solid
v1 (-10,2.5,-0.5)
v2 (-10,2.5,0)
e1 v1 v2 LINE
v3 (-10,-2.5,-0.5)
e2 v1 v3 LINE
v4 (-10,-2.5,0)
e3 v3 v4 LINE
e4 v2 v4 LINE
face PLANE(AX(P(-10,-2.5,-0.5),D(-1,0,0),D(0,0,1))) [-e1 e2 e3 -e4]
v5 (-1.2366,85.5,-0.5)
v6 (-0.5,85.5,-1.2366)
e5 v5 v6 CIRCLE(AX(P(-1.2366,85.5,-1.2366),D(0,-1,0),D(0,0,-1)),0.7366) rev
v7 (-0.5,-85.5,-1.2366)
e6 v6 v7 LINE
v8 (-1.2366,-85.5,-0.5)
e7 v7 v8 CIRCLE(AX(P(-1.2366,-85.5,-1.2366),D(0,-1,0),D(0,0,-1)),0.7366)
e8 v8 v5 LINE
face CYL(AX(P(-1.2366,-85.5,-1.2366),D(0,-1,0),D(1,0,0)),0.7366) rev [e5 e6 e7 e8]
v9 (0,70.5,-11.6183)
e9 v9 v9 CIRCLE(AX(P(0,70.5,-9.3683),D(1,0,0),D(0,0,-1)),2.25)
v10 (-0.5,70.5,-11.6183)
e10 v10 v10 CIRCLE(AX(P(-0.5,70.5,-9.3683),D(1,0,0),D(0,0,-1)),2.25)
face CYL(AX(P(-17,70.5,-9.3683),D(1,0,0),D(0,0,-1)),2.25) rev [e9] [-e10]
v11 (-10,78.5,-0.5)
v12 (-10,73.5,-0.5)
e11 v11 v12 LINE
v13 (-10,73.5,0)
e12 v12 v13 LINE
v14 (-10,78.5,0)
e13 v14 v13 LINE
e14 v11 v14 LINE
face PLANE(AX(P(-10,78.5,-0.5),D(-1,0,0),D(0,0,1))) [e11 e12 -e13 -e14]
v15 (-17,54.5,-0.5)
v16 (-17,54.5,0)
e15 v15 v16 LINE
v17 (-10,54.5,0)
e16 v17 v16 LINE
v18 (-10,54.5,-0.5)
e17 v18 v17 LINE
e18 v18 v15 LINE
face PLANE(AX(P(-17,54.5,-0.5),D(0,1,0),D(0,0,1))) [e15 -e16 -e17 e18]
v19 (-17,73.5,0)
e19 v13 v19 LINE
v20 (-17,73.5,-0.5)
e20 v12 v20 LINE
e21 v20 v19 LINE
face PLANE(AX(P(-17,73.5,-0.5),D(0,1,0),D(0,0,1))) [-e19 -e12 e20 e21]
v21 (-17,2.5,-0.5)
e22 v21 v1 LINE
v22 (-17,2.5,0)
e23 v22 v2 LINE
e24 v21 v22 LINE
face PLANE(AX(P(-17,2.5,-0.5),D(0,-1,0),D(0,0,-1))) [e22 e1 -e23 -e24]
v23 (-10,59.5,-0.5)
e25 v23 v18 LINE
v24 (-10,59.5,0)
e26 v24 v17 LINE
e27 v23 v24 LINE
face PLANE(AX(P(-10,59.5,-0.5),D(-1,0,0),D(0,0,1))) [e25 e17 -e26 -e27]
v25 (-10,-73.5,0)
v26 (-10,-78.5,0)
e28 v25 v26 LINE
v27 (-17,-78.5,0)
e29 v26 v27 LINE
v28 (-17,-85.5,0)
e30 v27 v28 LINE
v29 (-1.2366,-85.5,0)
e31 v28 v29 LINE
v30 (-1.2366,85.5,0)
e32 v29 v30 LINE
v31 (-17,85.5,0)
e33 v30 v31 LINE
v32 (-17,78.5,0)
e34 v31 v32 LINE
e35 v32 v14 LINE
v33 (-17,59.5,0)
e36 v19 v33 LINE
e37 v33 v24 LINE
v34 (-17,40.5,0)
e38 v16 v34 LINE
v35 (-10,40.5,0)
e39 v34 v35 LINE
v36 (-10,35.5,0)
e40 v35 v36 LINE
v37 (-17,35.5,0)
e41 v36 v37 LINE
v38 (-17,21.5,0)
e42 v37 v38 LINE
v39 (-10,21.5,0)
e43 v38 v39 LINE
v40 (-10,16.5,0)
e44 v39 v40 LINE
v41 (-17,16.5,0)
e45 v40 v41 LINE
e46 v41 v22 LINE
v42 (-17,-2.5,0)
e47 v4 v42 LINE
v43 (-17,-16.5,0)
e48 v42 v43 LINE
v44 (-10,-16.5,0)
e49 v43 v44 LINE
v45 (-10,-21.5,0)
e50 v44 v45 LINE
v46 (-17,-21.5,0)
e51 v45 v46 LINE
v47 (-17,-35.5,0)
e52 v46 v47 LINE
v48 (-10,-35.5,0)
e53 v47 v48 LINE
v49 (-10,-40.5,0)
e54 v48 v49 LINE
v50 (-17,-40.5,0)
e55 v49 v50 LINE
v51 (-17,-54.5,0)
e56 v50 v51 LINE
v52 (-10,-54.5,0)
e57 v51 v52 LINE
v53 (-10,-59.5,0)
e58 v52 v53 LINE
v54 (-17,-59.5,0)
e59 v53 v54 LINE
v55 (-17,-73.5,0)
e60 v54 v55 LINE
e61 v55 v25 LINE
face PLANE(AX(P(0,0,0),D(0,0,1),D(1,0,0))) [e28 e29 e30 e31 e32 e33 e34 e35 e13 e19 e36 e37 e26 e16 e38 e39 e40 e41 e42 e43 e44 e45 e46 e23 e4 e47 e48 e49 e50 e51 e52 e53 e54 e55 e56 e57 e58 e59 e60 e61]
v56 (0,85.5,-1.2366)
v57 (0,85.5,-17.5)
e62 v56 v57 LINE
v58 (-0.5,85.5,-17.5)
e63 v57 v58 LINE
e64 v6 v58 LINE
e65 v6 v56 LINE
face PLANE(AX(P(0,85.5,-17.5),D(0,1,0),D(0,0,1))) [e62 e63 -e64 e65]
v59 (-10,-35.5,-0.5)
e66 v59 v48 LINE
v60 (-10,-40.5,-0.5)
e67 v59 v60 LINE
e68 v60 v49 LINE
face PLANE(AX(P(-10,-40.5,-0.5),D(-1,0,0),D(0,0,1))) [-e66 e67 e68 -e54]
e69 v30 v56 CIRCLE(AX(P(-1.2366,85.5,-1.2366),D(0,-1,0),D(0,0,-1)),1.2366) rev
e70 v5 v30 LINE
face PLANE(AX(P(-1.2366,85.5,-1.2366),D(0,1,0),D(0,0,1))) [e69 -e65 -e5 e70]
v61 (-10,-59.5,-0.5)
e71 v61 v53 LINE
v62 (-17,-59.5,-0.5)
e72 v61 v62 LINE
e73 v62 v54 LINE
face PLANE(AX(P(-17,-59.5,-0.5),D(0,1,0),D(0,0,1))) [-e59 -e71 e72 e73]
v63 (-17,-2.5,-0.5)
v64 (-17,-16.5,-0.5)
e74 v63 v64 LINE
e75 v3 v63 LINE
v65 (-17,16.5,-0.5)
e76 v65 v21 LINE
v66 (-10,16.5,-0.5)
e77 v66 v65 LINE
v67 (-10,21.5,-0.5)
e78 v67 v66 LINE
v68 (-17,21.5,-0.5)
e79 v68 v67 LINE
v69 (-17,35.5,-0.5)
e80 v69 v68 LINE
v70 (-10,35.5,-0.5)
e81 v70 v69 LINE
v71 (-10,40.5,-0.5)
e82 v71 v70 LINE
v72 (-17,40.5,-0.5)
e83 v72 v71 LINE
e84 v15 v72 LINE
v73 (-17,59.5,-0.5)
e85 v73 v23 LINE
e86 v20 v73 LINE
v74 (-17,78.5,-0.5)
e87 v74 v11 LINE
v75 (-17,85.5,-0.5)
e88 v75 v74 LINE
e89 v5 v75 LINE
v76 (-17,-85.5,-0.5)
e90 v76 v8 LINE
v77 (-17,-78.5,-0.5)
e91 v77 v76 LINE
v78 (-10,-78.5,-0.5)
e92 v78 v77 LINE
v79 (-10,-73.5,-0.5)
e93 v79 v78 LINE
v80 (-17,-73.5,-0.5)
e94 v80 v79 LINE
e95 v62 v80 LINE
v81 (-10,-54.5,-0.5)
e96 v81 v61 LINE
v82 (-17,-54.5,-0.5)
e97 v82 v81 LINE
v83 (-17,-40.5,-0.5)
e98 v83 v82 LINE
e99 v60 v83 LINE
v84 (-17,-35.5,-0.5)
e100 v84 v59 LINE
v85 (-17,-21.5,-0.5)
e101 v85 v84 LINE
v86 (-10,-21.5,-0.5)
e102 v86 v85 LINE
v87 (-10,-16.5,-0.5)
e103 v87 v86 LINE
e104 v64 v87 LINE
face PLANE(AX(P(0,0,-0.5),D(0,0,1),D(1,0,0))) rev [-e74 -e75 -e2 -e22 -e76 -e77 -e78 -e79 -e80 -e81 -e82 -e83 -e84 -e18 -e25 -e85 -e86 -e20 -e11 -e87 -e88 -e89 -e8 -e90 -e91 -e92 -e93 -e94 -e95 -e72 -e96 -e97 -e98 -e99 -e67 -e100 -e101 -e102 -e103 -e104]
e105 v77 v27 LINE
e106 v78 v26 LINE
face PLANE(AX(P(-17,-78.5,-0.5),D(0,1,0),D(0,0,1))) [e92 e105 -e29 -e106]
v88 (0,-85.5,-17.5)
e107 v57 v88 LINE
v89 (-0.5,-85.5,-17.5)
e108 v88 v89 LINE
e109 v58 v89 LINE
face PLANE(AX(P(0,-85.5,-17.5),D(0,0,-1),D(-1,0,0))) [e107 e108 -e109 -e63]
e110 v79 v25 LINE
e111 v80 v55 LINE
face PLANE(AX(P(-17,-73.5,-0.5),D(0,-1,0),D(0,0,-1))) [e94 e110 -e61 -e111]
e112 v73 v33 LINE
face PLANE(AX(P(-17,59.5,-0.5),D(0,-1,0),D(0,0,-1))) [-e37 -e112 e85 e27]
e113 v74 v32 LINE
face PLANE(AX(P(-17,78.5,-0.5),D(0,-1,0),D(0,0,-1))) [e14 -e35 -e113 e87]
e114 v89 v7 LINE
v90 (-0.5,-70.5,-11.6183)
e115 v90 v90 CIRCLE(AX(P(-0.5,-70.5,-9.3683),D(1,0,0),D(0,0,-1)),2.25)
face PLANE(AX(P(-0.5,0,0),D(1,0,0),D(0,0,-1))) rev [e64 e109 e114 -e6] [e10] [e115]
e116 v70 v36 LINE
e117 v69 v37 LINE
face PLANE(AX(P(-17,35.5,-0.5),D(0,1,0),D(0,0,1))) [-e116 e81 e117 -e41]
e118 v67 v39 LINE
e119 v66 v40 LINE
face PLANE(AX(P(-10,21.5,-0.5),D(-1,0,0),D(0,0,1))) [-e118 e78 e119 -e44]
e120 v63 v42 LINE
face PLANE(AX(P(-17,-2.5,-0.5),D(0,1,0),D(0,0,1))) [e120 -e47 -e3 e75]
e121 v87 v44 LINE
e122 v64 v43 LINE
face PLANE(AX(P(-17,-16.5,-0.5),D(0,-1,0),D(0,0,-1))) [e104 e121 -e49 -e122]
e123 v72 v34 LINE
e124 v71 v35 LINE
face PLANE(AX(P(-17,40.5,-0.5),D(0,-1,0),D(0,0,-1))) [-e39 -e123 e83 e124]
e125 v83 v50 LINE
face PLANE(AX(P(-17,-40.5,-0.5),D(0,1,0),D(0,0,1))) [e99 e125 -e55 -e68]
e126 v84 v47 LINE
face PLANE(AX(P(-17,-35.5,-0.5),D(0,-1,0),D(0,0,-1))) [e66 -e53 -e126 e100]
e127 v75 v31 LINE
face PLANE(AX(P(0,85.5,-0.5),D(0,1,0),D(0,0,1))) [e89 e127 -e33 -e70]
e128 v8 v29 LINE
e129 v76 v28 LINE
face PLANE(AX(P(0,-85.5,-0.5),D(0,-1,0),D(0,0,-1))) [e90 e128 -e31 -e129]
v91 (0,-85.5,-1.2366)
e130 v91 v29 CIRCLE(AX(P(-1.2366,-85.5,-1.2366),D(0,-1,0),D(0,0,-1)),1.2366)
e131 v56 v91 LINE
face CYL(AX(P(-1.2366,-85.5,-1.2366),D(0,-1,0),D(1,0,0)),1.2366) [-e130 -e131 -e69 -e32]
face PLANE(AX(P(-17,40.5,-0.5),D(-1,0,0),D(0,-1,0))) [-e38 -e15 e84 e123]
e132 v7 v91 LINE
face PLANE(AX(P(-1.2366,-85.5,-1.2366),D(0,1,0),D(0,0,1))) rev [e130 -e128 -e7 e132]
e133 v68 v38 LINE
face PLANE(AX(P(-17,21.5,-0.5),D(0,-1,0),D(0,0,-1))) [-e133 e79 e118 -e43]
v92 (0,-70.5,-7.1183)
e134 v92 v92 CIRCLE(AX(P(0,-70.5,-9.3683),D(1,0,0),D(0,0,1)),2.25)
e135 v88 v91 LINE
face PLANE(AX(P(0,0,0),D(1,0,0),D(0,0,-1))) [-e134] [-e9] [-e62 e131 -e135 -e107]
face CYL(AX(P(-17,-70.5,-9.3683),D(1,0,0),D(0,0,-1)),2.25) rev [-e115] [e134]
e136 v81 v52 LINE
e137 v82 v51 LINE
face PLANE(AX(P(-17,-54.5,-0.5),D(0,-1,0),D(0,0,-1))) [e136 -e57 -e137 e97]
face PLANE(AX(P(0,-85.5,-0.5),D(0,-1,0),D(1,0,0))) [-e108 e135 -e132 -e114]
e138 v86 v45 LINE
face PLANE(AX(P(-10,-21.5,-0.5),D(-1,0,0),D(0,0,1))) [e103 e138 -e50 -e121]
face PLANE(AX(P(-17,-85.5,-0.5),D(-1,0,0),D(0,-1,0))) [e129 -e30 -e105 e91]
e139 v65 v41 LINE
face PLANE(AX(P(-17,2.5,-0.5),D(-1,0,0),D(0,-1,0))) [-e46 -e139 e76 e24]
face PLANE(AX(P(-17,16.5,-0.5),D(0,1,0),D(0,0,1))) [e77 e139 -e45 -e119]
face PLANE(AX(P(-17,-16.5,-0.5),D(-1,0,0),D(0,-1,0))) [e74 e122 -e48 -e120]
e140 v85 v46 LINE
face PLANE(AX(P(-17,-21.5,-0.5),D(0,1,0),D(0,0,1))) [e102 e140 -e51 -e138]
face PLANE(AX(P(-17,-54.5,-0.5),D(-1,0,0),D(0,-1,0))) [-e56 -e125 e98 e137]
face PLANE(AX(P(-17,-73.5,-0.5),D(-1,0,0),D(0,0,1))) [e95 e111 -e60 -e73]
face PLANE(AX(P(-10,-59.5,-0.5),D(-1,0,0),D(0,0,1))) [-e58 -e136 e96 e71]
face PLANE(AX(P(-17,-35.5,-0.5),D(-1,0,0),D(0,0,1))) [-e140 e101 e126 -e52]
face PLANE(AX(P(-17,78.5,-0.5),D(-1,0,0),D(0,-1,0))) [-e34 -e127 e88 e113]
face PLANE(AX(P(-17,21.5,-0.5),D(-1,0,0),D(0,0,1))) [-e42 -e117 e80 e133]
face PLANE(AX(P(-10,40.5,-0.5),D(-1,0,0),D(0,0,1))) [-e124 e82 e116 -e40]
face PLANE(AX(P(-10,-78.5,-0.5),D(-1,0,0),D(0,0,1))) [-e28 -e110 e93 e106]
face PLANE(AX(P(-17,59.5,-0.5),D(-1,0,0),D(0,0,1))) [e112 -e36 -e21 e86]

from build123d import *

# Parameters (mm, degrees)
T_LE_DE_BASE_PLI_E1_DEPTH             = 0.5
T_LE_PLI_E_SUR_AR_TE1_STRIP_W         = 3.4732
T_LE_PLI_E_SUR_AR_TE1_STRIP_H         = 0.5
T_LE_PLI_E_SUR_AR_TE1_STRIP_CUT_DEPTH = 171
T_LE_PLI_E_SUR_AR_TE1_DEPTH           = 171
PER_AGE1_START                        = -0.5
PER_AGE1_OUTLINE_R                    = 2.25
PER_AGE1_DEPTH                        = 0.5


# Read off the part's stored shape, not the designer's step: Perçage1
# Sheet-metal steps are written as plain solids
with BuildPart() as part:
    # Esquisse1 → Tôle de base pliée1 (new body)
    with BuildSketch(Plane.XY):
        Polygon((0, -85.5), (-17, -85.5), (-17, -78.5), (-10, -78.5), (-10, -73.5), (-17, -73.5), (-17, -59.5), (-10, -59.5), (-10, -54.5), (-17, -54.5), (-17, -40.5), (-10, -40.5), (-10, -35.5), (-17, -35.5), (-17, -21.5), (-10, -21.5), (-10, -16.5), (-17, -16.5), (-17, -2.5), (-10, -2.5), (-10, 2.5), (-17, 2.5), (-17, 16.5), (-10, 16.5), (-10, 21.5), (-17, 21.5), (-17, 35.5), (-10, 35.5), (-10, 40.5), (-17, 40.5), (-17, 54.5), (-10, 54.5), (-10, 59.5), (-17, 59.5), (-17, 73.5), (-10, 73.5), (-10, 78.5), (-17, 78.5), (-17, 85.5), (0, 85.5), align=None)
    extrude(amount=-T_LE_DE_BASE_PLI_E1_DEPTH)

    # Tôle pliée sur arête1 strip (across the edge) → Tôle pliée sur arête1 strip cut (cut)
    with BuildSketch(Plane(origin=(0, 85.5, -0.5), x_dir=(-1, 0, 0), z_dir=(0, -1, 0))):
        with Locations((-0.5, -0.25)):
            Rectangle(T_LE_PLI_E_SUR_AR_TE1_STRIP_W, T_LE_PLI_E_SUR_AR_TE1_STRIP_H)
    extrude(amount=T_LE_PLI_E_SUR_AR_TE1_STRIP_CUT_DEPTH, mode=Mode.SUBTRACT)

    # Tôle pliée sur arête1 section (across the edge) → Tôle pliée sur arête1 (add)
    with BuildSketch(Plane(origin=(0, 85.5, -0.5), x_dir=(-1, 0, 0), z_dir=(0, -1, 0))):
        with BuildLine():
            Line((0, 0.7366), (0, 17))
            Line((0, 17), (0.5, 17))
            Line((0.5, 17), (0.5, 0.7366))
            ThreePointArc((0.5, 0.7366), (0.715745145, 0.215745145), (1.2366, 0))
            Line((1.2366, 0), (1.2366, -0.5))
            ThreePointArc((1.2366, -0.5), (0.362191754, -0.137808246), (0, 0.7366))
        make_face()
    extrude(amount=T_LE_PLI_E_SUR_AR_TE1_DEPTH)

    # Perçage1 outline → Perçage1 (cut)
    with BuildSketch(Plane.YZ.offset(PER_AGE1_START)):
        with Locations((-70.5, -9.3683)):
            Circle(PER_AGE1_OUTLINE_R)
        with Locations((70.5, -9.3683)):
            Circle(PER_AGE1_OUTLINE_R)
    extrude(amount=PER_AGE1_DEPTH, mode=Mode.SUBTRACT)


solid = part.part
